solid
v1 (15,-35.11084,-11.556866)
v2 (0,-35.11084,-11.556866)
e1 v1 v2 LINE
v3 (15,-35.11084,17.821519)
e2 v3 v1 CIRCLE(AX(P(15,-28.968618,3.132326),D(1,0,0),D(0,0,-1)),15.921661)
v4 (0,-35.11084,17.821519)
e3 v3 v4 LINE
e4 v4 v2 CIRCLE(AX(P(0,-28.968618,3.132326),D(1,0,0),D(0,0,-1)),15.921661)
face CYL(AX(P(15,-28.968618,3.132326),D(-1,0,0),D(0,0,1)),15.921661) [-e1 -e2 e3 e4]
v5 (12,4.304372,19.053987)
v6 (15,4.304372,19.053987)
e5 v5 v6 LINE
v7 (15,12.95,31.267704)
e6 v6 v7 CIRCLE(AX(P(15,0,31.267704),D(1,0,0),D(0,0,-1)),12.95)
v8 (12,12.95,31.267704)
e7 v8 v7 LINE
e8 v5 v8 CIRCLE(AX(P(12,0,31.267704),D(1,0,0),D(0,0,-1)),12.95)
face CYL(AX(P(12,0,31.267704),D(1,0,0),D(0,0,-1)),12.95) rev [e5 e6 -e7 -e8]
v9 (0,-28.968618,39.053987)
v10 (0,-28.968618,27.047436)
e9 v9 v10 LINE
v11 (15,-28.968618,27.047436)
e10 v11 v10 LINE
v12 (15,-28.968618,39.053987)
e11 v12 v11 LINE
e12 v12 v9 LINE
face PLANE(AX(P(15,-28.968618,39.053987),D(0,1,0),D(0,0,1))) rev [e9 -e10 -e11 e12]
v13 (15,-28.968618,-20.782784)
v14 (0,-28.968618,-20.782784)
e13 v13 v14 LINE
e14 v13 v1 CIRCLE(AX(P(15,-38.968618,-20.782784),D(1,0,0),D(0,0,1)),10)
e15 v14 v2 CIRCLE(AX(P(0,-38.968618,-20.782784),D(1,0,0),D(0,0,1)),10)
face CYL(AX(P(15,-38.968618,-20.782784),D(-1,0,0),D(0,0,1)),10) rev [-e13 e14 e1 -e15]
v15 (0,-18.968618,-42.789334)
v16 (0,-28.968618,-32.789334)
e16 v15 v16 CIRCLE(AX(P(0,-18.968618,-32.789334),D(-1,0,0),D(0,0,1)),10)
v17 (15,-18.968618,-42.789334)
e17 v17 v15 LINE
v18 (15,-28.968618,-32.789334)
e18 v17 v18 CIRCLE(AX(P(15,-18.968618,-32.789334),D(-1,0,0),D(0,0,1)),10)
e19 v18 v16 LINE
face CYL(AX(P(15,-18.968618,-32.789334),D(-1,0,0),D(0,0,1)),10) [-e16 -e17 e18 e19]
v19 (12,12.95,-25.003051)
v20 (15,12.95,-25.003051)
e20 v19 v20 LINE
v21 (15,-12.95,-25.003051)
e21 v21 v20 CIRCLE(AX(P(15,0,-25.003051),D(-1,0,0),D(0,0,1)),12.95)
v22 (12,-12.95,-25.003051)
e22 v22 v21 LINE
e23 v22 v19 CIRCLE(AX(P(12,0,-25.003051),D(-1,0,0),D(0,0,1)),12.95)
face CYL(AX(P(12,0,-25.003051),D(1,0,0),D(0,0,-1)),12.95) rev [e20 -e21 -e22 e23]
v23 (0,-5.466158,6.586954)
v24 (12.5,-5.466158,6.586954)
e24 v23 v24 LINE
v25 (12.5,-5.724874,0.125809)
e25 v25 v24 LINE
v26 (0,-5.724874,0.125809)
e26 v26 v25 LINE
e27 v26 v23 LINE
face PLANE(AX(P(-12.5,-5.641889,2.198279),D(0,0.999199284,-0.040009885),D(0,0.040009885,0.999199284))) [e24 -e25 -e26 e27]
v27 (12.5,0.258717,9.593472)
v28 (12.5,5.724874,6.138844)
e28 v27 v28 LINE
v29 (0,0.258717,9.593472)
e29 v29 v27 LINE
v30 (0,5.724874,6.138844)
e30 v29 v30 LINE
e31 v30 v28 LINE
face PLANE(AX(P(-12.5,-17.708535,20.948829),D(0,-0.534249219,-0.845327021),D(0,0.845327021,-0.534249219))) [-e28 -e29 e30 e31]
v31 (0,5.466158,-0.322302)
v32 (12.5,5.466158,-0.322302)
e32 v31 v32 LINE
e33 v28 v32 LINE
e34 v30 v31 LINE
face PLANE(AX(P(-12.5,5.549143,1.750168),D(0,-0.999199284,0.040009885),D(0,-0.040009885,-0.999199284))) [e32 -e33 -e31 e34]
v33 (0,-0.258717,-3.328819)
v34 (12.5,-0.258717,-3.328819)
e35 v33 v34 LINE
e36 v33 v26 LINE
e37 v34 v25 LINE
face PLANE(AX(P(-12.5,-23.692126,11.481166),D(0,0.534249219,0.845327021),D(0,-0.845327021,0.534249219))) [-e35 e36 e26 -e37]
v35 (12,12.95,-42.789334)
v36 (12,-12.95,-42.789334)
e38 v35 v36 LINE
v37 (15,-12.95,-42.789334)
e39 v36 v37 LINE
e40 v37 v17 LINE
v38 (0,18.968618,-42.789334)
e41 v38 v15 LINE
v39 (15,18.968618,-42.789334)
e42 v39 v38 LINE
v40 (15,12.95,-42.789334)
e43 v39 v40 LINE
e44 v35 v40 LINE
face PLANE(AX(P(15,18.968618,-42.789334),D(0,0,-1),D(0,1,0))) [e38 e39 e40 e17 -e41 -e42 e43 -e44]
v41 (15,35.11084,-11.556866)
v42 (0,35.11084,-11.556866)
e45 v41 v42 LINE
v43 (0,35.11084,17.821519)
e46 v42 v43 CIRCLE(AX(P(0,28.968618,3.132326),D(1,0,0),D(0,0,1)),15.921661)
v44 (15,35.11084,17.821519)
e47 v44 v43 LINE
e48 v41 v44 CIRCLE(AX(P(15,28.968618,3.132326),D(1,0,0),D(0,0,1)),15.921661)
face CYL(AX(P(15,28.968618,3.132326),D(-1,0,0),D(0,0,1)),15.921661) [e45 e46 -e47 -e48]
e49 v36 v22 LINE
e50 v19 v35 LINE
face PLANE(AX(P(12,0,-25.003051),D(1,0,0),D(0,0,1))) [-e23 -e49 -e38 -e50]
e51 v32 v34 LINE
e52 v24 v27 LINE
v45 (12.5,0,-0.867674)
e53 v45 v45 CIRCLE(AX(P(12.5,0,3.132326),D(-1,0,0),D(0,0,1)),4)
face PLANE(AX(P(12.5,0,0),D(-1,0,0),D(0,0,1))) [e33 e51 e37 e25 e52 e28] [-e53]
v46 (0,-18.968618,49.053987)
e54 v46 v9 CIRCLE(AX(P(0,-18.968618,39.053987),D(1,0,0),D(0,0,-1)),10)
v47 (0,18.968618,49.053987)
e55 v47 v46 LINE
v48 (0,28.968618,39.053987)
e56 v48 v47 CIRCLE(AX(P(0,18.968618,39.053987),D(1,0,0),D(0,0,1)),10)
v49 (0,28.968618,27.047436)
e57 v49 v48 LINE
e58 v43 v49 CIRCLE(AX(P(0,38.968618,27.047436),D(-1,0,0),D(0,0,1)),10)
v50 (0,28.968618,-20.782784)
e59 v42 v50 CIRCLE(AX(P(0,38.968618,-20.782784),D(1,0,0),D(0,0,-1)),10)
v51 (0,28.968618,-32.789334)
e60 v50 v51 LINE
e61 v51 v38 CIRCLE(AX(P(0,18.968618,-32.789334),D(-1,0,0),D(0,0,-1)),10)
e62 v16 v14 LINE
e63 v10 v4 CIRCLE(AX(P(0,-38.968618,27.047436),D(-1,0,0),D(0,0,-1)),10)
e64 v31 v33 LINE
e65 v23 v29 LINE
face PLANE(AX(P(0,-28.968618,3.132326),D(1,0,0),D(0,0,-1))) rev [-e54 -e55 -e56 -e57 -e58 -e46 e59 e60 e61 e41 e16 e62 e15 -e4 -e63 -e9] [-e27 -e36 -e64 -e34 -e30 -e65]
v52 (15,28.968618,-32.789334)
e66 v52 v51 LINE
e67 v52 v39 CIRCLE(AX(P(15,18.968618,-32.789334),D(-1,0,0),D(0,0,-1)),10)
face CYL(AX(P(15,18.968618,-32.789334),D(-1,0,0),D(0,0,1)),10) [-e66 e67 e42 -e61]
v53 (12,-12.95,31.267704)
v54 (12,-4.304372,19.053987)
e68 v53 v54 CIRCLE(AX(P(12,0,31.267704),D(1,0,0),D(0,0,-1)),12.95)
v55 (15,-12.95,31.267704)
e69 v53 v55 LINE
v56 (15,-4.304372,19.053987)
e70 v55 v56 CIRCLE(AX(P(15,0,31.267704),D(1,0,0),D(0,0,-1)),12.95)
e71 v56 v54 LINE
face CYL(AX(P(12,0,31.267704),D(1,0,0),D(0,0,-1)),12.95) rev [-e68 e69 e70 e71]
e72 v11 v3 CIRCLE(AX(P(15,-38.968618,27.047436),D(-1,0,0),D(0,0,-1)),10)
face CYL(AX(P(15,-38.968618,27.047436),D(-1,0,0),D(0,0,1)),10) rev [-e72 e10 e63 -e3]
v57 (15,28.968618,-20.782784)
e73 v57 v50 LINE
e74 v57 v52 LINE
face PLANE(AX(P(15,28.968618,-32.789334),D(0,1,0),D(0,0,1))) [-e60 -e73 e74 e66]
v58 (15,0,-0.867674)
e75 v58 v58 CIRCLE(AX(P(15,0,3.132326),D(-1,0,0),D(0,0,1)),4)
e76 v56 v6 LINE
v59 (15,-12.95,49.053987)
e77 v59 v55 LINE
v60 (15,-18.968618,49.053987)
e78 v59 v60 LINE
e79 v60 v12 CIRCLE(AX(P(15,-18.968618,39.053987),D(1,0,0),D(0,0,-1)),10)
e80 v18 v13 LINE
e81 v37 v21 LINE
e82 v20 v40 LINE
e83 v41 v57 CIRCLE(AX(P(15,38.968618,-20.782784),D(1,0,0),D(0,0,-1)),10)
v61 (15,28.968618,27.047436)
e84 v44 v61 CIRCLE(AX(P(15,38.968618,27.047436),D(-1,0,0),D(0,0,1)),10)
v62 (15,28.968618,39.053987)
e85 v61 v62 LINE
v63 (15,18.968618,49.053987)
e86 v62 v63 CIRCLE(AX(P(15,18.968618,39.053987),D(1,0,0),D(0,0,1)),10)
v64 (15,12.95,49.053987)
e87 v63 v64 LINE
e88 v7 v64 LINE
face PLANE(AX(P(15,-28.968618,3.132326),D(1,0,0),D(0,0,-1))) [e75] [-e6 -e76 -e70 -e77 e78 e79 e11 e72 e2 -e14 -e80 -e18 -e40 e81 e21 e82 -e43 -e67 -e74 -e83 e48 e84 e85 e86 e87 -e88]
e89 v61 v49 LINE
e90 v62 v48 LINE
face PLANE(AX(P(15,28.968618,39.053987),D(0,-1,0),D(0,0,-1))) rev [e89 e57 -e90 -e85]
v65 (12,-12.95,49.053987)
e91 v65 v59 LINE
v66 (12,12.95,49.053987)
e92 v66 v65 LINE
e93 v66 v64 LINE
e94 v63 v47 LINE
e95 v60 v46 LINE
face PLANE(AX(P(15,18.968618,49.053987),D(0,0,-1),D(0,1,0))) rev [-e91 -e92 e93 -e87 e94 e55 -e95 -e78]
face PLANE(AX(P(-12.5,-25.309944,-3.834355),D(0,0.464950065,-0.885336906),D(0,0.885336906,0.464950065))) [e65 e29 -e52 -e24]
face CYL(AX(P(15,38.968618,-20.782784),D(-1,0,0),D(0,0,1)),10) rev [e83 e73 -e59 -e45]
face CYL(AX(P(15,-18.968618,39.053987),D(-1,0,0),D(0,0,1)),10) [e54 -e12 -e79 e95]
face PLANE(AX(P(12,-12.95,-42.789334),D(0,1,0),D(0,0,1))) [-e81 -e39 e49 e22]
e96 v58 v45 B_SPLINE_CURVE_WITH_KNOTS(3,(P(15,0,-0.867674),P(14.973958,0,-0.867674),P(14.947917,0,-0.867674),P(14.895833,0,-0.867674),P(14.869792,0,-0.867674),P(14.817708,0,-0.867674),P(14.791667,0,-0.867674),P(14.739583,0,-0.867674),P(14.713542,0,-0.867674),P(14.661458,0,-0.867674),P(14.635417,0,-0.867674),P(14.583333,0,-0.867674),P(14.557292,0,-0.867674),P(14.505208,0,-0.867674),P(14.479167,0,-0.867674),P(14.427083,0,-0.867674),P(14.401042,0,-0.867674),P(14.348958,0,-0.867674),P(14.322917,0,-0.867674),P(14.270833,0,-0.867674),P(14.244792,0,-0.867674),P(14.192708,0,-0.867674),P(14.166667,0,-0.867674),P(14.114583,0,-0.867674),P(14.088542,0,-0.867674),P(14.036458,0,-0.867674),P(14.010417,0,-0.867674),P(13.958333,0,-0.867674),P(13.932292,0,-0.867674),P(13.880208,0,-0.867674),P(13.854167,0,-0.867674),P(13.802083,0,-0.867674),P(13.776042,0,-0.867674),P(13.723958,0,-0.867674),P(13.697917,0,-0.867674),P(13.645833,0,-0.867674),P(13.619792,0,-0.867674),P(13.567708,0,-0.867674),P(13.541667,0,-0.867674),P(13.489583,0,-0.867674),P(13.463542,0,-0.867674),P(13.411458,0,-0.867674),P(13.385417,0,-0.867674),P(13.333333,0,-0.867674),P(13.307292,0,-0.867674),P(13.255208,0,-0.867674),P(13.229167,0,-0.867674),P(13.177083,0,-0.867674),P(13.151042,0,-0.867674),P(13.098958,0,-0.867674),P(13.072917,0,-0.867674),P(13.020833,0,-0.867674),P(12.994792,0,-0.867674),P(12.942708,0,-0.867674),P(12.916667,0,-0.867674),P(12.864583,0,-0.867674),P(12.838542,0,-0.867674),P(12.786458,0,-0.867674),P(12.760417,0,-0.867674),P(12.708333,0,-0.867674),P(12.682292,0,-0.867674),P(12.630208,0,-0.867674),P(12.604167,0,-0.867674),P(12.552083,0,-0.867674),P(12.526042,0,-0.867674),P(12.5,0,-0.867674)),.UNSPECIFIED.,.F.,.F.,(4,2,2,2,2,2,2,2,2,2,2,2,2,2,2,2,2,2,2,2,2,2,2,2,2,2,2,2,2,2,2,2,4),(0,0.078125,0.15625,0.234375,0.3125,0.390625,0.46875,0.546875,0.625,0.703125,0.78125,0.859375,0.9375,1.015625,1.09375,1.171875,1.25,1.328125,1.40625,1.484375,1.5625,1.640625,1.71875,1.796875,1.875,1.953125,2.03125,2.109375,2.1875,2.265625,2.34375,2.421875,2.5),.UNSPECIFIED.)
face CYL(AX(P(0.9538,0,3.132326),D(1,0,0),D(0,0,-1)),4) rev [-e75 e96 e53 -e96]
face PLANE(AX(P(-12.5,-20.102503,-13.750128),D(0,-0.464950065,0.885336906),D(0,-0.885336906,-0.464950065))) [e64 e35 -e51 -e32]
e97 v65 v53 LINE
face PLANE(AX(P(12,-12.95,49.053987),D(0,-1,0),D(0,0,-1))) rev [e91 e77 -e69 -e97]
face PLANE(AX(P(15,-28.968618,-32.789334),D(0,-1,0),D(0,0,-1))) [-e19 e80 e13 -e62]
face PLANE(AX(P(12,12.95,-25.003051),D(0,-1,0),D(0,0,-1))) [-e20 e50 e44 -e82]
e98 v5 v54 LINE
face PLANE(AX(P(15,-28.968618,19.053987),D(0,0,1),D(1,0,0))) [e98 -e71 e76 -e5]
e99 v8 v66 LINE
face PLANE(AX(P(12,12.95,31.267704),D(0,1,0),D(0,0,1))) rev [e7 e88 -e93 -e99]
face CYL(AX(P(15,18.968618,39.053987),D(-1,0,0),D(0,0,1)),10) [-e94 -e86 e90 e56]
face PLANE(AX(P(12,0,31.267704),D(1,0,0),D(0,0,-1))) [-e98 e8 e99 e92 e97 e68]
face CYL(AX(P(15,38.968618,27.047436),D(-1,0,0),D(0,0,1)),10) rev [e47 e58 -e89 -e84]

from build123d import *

# Parameters (mm, degrees)
BOSS_EXTRUDE3_DEPTH = 15
SKETCH3_R           = 4
CUT_EXTRUDE3_DEPTH  = 14.0462
CUT_EXTRUDE4_DEPTH  = 3
CUT_EXTRUDE5_START  = -15
CUT_EXTRUDE5_DEPTH  = 12.5
MIRROR1_DEPTH       = 12.5
MIRROR1_START       = 12
MIRROR1_2_DEPTH     = 3
MIRROR1_3_DEPTH     = 12
MIRROR1_4_DEPTH     = 3


# Read off the part's stored shape, not the designer's step: Mirror1
with BuildPart() as part:
    # Sketch1 → Boss-Extrude3 (new body)
    with BuildSketch(Plane.YZ):
        with BuildLine():
            Line((-28.968617751, -12.789334175), (28.968617751, -12.789334175))
            ThreePointArc((28.968617751, -12.789334175), (44.579120821, 0), (35.110840206, 17.821518929))
            ThreePointArc((35.110840206, 17.821518929), (30.644623053, 21.505675602), (28.968617751, 27.047436358))
            Line((28.968617751, 27.047436358), (28.968617751, 39.053986921))
            ThreePointArc((28.968617751, 39.053986921), (26.039685563, 46.125054733), (18.968617751, 49.053986921))
            Line((18.968617751, 49.053986921), (-18.968617751, 49.053986921))
            ThreePointArc((-18.968617751, 49.053986921), (-26.039685563, 46.125054733), (-28.968617751, 39.053986921))
            Line((-28.968617751, 39.053986921), (-28.968617751, 27.047436358))
            ThreePointArc((-28.968617751, 27.047436358), (-30.644623053, 21.505675602), (-35.110840206, 17.821518929))
            ThreePointArc((-35.110840206, 17.821518929), (-44.579120821, 0), (-28.968617751, -12.789334175))
        make_face()
    extrude(amount=BOSS_EXTRUDE3_DEPTH)

    # Sketch3 → Cut-Extrude3 (cut)
    with BuildSketch(Plane.YZ.offset(15)):
        with Locations(Location((0, 3.132326373, 0), (0, 0, 270))):
            Circle(SKETCH3_R)
    extrude(amount=-CUT_EXTRUDE3_DEPTH, mode=Mode.SUBTRACT)

    # Sketch4 → Cut-Extrude4 (cut)
    with BuildSketch(Plane.YZ.offset(15)):
        with BuildLine():
            Line((-12.95, 49.053986921), (-12.95, 31.267703884))
            ThreePointArc((-12.95, 31.267703884), (0, 18.317703884), (12.95, 31.267703884))
            Line((12.95, 31.267703884), (12.95, 49.053986921))
            Line((12.95, 49.053986921), (-12.95, 49.053986921))
        make_face()
    extrude(amount=-CUT_EXTRUDE4_DEPTH, mode=Mode.SUBTRACT)

    # Sketch5 → Cut-Extrude5 (cut, symmetric)
    with BuildSketch(Plane.YZ.offset(15).offset(CUT_EXTRUDE5_START)):
        Polygon((5.466157569, 6.586954394), (-0.258716842, 9.5934717), (-5.724874411, 6.138843679), (-5.466157569, -0.322301647), (0.258716842, -3.328818953), (5.724874411, 0.125809067), align=None)
    extrude(amount=CUT_EXTRUDE5_DEPTH, both=True, mode=Mode.SUBTRACT)

    # Mirror1 outline → Mirror1 (cut)
    with BuildSketch(Plane.YZ):
        Polygon((-2.802243807, -1.721302263), (-0.258716842, -3.328818953), (0, -3.192949306), align=None)
        Polygon((-5.724874411, 0.125809067), (-5.477849424, -0.030311467), (-5.604487603, 3.132326373), align=None)
        Polygon((5.477849424, -0.030311467), (2.802243807, -1.721302263), (5.466157569, -0.322301647), align=None)
        Polygon((-5.466157569, 6.586954394), (-5.477849424, 6.294964213), (-2.802243802, 7.985955012), align=None)
        Polygon((5.477849424, 6.294964213), (5.604487603, 3.132326373), (5.724874411, 6.138843679), align=None)
        Polygon((0.258716842, 9.5934717), (0, 9.457602053), (2.802243802, 7.985955012), align=None)
    extrude(amount=MIRROR1_DEPTH, mode=Mode.SUBTRACT)

    # Mirror1 2 outline → Mirror1 2 (cut)
    with BuildSketch(Plane.YZ.offset(MIRROR1_START)):
        with BuildLine():
            ThreePointArc((4.30437196, -12.789334175), (0, -12.053051137), (-4.30437196, -12.789334175))
            Line((-4.30437196, -12.789334175), (4.30437196, -12.789334175))
        make_face()
    extrude(amount=MIRROR1_2_DEPTH, mode=Mode.SUBTRACT)

    # Mirror1 3 outline → Mirror1 3 (add)
    with BuildSketch(Plane.YZ):
        with BuildLine():
            ThreePointArc((-28.968617751, -32.789334175), (-26.039685563, -39.860401987), (-18.968617751, -42.789334175))
            Line((-18.968617751, -42.789334175), (18.968617751, -42.789334175))
            ThreePointArc((18.968617751, -42.789334175), (26.039685563, -39.860401987), (28.968617751, -32.789334175))
            Line((28.968617751, -32.789334175), (28.968617751, -20.782783611))
            ThreePointArc((28.968617751, -20.782783611), (30.644623053, -15.241022855), (35.110840206, -11.556866182))
            ThreePointArc((35.110840206, -11.556866182), (32.100944124, -12.478176697), (28.968617751, -12.789334175))
            Line((28.968617751, -12.789334175), (-28.968617751, -12.789334175))
            ThreePointArc((-28.968617751, -12.789334175), (-32.100944124, -12.478176697), (-35.110840206, -11.556866182))
            ThreePointArc((-35.110840206, -11.556866182), (-30.644623053, -15.241022855), (-28.968617751, -20.782783611))
            Line((-28.968617751, -20.782783611), (-28.968617751, -32.789334175))
        make_face()
        Polygon((-5.466157569, -0.322301647), (-2.802243807, -1.721302263), (-5.477849424, -0.030311467), align=None)
        Polygon((2.802243807, -1.721302263), (0, -3.192949306), (0.258716842, -3.328818953), align=None)
        Polygon((-5.724874411, 6.138843679), (-5.604487603, 3.132326373), (-5.477849424, 6.294964213), align=None)
        Polygon((5.604487603, 3.132326373), (5.477849424, -0.030311467), (5.724874411, 0.125809067), align=None)
        Polygon((-0.258716842, 9.5934717), (-2.802243802, 7.985955012), (0, 9.457602053), align=None)
        Polygon((2.802243802, 7.985955012), (5.477849424, 6.294964213), (5.466157569, 6.586954394), align=None)
    extrude(amount=MIRROR1_3_DEPTH)

    # Mirror1 4 outline → Mirror1 4 (add)
    with BuildSketch(Plane.YZ.offset(MIRROR1_START)):
        with BuildLine():
            ThreePointArc((-28.968617751, -32.789334175), (-26.039685563, -39.860401987), (-18.968617751, -42.789334175))
            Line((-18.968617751, -42.789334175), (-12.95, -42.789334175))
            Line((-12.95, -42.789334175), (-12.95, -25.003051137))
            ThreePointArc((-12.95, -25.003051137), (-10.569865583, -17.521043281), (-4.30437196, -12.789334175))
            Line((-4.30437196, -12.789334175), (-28.968617751, -12.789334175))
            ThreePointArc((-28.968617751, -12.789334175), (-32.100944124, -12.478176697), (-35.110840206, -11.556866182))
            ThreePointArc((-35.110840206, -11.556866182), (-30.644623053, -15.241022855), (-28.968617751, -20.782783611))
            Line((-28.968617751, -20.782783611), (-28.968617751, -32.789334175))
        make_face()
        with BuildLine():
            Line((12.95, -25.003051137), (12.95, -42.789334175))
            Line((12.95, -42.789334175), (18.968617751, -42.789334175))
            ThreePointArc((18.968617751, -42.789334175), (26.039685563, -39.860401987), (28.968617751, -32.789334175))
            Line((28.968617751, -32.789334175), (28.968617751, -20.782783611))
            ThreePointArc((28.968617751, -20.782783611), (30.644623053, -15.241022855), (35.110840206, -11.556866182))
            ThreePointArc((35.110840206, -11.556866182), (32.100944124, -12.478176697), (28.968617751, -12.789334175))
            Line((28.968617751, -12.789334175), (4.30437196, -12.789334175))
            ThreePointArc((4.30437196, -12.789334175), (10.569865583, -17.521043281), (12.95, -25.003051137))
        make_face()
        with BuildLine():
            ThreePointArc((-4.304371959, 19.053986921), (0, 18.317703884), (4.304371959, 19.053986921))
            Line((4.304371959, 19.053986921), (-4.304371959, 19.053986921))
        make_face()
        Polygon((-5.466157569, -0.322301647), (-2.802243807, -1.721302263), (-5.477849424, -0.030311467), align=None)
        Polygon((2.802243807, -1.721302263), (0, -3.192949306), (0.258716842, -3.328818953), align=None)
        Polygon((-5.724874411, 6.138843679), (-5.604487603, 3.132326373), (-5.477849424, 6.294964213), align=None)
        Polygon((5.604487603, 3.132326373), (5.477849424, -0.030311467), (5.724874411, 0.125809067), align=None)
        Polygon((-0.258716842, 9.5934717), (-2.802243802, 7.985955012), (0, 9.457602053), align=None)
        Polygon((2.802243802, 7.985955012), (5.477849424, 6.294964213), (5.466157569, 6.586954394), align=None)
    extrude(amount=MIRROR1_4_DEPTH)


solid = part.part
